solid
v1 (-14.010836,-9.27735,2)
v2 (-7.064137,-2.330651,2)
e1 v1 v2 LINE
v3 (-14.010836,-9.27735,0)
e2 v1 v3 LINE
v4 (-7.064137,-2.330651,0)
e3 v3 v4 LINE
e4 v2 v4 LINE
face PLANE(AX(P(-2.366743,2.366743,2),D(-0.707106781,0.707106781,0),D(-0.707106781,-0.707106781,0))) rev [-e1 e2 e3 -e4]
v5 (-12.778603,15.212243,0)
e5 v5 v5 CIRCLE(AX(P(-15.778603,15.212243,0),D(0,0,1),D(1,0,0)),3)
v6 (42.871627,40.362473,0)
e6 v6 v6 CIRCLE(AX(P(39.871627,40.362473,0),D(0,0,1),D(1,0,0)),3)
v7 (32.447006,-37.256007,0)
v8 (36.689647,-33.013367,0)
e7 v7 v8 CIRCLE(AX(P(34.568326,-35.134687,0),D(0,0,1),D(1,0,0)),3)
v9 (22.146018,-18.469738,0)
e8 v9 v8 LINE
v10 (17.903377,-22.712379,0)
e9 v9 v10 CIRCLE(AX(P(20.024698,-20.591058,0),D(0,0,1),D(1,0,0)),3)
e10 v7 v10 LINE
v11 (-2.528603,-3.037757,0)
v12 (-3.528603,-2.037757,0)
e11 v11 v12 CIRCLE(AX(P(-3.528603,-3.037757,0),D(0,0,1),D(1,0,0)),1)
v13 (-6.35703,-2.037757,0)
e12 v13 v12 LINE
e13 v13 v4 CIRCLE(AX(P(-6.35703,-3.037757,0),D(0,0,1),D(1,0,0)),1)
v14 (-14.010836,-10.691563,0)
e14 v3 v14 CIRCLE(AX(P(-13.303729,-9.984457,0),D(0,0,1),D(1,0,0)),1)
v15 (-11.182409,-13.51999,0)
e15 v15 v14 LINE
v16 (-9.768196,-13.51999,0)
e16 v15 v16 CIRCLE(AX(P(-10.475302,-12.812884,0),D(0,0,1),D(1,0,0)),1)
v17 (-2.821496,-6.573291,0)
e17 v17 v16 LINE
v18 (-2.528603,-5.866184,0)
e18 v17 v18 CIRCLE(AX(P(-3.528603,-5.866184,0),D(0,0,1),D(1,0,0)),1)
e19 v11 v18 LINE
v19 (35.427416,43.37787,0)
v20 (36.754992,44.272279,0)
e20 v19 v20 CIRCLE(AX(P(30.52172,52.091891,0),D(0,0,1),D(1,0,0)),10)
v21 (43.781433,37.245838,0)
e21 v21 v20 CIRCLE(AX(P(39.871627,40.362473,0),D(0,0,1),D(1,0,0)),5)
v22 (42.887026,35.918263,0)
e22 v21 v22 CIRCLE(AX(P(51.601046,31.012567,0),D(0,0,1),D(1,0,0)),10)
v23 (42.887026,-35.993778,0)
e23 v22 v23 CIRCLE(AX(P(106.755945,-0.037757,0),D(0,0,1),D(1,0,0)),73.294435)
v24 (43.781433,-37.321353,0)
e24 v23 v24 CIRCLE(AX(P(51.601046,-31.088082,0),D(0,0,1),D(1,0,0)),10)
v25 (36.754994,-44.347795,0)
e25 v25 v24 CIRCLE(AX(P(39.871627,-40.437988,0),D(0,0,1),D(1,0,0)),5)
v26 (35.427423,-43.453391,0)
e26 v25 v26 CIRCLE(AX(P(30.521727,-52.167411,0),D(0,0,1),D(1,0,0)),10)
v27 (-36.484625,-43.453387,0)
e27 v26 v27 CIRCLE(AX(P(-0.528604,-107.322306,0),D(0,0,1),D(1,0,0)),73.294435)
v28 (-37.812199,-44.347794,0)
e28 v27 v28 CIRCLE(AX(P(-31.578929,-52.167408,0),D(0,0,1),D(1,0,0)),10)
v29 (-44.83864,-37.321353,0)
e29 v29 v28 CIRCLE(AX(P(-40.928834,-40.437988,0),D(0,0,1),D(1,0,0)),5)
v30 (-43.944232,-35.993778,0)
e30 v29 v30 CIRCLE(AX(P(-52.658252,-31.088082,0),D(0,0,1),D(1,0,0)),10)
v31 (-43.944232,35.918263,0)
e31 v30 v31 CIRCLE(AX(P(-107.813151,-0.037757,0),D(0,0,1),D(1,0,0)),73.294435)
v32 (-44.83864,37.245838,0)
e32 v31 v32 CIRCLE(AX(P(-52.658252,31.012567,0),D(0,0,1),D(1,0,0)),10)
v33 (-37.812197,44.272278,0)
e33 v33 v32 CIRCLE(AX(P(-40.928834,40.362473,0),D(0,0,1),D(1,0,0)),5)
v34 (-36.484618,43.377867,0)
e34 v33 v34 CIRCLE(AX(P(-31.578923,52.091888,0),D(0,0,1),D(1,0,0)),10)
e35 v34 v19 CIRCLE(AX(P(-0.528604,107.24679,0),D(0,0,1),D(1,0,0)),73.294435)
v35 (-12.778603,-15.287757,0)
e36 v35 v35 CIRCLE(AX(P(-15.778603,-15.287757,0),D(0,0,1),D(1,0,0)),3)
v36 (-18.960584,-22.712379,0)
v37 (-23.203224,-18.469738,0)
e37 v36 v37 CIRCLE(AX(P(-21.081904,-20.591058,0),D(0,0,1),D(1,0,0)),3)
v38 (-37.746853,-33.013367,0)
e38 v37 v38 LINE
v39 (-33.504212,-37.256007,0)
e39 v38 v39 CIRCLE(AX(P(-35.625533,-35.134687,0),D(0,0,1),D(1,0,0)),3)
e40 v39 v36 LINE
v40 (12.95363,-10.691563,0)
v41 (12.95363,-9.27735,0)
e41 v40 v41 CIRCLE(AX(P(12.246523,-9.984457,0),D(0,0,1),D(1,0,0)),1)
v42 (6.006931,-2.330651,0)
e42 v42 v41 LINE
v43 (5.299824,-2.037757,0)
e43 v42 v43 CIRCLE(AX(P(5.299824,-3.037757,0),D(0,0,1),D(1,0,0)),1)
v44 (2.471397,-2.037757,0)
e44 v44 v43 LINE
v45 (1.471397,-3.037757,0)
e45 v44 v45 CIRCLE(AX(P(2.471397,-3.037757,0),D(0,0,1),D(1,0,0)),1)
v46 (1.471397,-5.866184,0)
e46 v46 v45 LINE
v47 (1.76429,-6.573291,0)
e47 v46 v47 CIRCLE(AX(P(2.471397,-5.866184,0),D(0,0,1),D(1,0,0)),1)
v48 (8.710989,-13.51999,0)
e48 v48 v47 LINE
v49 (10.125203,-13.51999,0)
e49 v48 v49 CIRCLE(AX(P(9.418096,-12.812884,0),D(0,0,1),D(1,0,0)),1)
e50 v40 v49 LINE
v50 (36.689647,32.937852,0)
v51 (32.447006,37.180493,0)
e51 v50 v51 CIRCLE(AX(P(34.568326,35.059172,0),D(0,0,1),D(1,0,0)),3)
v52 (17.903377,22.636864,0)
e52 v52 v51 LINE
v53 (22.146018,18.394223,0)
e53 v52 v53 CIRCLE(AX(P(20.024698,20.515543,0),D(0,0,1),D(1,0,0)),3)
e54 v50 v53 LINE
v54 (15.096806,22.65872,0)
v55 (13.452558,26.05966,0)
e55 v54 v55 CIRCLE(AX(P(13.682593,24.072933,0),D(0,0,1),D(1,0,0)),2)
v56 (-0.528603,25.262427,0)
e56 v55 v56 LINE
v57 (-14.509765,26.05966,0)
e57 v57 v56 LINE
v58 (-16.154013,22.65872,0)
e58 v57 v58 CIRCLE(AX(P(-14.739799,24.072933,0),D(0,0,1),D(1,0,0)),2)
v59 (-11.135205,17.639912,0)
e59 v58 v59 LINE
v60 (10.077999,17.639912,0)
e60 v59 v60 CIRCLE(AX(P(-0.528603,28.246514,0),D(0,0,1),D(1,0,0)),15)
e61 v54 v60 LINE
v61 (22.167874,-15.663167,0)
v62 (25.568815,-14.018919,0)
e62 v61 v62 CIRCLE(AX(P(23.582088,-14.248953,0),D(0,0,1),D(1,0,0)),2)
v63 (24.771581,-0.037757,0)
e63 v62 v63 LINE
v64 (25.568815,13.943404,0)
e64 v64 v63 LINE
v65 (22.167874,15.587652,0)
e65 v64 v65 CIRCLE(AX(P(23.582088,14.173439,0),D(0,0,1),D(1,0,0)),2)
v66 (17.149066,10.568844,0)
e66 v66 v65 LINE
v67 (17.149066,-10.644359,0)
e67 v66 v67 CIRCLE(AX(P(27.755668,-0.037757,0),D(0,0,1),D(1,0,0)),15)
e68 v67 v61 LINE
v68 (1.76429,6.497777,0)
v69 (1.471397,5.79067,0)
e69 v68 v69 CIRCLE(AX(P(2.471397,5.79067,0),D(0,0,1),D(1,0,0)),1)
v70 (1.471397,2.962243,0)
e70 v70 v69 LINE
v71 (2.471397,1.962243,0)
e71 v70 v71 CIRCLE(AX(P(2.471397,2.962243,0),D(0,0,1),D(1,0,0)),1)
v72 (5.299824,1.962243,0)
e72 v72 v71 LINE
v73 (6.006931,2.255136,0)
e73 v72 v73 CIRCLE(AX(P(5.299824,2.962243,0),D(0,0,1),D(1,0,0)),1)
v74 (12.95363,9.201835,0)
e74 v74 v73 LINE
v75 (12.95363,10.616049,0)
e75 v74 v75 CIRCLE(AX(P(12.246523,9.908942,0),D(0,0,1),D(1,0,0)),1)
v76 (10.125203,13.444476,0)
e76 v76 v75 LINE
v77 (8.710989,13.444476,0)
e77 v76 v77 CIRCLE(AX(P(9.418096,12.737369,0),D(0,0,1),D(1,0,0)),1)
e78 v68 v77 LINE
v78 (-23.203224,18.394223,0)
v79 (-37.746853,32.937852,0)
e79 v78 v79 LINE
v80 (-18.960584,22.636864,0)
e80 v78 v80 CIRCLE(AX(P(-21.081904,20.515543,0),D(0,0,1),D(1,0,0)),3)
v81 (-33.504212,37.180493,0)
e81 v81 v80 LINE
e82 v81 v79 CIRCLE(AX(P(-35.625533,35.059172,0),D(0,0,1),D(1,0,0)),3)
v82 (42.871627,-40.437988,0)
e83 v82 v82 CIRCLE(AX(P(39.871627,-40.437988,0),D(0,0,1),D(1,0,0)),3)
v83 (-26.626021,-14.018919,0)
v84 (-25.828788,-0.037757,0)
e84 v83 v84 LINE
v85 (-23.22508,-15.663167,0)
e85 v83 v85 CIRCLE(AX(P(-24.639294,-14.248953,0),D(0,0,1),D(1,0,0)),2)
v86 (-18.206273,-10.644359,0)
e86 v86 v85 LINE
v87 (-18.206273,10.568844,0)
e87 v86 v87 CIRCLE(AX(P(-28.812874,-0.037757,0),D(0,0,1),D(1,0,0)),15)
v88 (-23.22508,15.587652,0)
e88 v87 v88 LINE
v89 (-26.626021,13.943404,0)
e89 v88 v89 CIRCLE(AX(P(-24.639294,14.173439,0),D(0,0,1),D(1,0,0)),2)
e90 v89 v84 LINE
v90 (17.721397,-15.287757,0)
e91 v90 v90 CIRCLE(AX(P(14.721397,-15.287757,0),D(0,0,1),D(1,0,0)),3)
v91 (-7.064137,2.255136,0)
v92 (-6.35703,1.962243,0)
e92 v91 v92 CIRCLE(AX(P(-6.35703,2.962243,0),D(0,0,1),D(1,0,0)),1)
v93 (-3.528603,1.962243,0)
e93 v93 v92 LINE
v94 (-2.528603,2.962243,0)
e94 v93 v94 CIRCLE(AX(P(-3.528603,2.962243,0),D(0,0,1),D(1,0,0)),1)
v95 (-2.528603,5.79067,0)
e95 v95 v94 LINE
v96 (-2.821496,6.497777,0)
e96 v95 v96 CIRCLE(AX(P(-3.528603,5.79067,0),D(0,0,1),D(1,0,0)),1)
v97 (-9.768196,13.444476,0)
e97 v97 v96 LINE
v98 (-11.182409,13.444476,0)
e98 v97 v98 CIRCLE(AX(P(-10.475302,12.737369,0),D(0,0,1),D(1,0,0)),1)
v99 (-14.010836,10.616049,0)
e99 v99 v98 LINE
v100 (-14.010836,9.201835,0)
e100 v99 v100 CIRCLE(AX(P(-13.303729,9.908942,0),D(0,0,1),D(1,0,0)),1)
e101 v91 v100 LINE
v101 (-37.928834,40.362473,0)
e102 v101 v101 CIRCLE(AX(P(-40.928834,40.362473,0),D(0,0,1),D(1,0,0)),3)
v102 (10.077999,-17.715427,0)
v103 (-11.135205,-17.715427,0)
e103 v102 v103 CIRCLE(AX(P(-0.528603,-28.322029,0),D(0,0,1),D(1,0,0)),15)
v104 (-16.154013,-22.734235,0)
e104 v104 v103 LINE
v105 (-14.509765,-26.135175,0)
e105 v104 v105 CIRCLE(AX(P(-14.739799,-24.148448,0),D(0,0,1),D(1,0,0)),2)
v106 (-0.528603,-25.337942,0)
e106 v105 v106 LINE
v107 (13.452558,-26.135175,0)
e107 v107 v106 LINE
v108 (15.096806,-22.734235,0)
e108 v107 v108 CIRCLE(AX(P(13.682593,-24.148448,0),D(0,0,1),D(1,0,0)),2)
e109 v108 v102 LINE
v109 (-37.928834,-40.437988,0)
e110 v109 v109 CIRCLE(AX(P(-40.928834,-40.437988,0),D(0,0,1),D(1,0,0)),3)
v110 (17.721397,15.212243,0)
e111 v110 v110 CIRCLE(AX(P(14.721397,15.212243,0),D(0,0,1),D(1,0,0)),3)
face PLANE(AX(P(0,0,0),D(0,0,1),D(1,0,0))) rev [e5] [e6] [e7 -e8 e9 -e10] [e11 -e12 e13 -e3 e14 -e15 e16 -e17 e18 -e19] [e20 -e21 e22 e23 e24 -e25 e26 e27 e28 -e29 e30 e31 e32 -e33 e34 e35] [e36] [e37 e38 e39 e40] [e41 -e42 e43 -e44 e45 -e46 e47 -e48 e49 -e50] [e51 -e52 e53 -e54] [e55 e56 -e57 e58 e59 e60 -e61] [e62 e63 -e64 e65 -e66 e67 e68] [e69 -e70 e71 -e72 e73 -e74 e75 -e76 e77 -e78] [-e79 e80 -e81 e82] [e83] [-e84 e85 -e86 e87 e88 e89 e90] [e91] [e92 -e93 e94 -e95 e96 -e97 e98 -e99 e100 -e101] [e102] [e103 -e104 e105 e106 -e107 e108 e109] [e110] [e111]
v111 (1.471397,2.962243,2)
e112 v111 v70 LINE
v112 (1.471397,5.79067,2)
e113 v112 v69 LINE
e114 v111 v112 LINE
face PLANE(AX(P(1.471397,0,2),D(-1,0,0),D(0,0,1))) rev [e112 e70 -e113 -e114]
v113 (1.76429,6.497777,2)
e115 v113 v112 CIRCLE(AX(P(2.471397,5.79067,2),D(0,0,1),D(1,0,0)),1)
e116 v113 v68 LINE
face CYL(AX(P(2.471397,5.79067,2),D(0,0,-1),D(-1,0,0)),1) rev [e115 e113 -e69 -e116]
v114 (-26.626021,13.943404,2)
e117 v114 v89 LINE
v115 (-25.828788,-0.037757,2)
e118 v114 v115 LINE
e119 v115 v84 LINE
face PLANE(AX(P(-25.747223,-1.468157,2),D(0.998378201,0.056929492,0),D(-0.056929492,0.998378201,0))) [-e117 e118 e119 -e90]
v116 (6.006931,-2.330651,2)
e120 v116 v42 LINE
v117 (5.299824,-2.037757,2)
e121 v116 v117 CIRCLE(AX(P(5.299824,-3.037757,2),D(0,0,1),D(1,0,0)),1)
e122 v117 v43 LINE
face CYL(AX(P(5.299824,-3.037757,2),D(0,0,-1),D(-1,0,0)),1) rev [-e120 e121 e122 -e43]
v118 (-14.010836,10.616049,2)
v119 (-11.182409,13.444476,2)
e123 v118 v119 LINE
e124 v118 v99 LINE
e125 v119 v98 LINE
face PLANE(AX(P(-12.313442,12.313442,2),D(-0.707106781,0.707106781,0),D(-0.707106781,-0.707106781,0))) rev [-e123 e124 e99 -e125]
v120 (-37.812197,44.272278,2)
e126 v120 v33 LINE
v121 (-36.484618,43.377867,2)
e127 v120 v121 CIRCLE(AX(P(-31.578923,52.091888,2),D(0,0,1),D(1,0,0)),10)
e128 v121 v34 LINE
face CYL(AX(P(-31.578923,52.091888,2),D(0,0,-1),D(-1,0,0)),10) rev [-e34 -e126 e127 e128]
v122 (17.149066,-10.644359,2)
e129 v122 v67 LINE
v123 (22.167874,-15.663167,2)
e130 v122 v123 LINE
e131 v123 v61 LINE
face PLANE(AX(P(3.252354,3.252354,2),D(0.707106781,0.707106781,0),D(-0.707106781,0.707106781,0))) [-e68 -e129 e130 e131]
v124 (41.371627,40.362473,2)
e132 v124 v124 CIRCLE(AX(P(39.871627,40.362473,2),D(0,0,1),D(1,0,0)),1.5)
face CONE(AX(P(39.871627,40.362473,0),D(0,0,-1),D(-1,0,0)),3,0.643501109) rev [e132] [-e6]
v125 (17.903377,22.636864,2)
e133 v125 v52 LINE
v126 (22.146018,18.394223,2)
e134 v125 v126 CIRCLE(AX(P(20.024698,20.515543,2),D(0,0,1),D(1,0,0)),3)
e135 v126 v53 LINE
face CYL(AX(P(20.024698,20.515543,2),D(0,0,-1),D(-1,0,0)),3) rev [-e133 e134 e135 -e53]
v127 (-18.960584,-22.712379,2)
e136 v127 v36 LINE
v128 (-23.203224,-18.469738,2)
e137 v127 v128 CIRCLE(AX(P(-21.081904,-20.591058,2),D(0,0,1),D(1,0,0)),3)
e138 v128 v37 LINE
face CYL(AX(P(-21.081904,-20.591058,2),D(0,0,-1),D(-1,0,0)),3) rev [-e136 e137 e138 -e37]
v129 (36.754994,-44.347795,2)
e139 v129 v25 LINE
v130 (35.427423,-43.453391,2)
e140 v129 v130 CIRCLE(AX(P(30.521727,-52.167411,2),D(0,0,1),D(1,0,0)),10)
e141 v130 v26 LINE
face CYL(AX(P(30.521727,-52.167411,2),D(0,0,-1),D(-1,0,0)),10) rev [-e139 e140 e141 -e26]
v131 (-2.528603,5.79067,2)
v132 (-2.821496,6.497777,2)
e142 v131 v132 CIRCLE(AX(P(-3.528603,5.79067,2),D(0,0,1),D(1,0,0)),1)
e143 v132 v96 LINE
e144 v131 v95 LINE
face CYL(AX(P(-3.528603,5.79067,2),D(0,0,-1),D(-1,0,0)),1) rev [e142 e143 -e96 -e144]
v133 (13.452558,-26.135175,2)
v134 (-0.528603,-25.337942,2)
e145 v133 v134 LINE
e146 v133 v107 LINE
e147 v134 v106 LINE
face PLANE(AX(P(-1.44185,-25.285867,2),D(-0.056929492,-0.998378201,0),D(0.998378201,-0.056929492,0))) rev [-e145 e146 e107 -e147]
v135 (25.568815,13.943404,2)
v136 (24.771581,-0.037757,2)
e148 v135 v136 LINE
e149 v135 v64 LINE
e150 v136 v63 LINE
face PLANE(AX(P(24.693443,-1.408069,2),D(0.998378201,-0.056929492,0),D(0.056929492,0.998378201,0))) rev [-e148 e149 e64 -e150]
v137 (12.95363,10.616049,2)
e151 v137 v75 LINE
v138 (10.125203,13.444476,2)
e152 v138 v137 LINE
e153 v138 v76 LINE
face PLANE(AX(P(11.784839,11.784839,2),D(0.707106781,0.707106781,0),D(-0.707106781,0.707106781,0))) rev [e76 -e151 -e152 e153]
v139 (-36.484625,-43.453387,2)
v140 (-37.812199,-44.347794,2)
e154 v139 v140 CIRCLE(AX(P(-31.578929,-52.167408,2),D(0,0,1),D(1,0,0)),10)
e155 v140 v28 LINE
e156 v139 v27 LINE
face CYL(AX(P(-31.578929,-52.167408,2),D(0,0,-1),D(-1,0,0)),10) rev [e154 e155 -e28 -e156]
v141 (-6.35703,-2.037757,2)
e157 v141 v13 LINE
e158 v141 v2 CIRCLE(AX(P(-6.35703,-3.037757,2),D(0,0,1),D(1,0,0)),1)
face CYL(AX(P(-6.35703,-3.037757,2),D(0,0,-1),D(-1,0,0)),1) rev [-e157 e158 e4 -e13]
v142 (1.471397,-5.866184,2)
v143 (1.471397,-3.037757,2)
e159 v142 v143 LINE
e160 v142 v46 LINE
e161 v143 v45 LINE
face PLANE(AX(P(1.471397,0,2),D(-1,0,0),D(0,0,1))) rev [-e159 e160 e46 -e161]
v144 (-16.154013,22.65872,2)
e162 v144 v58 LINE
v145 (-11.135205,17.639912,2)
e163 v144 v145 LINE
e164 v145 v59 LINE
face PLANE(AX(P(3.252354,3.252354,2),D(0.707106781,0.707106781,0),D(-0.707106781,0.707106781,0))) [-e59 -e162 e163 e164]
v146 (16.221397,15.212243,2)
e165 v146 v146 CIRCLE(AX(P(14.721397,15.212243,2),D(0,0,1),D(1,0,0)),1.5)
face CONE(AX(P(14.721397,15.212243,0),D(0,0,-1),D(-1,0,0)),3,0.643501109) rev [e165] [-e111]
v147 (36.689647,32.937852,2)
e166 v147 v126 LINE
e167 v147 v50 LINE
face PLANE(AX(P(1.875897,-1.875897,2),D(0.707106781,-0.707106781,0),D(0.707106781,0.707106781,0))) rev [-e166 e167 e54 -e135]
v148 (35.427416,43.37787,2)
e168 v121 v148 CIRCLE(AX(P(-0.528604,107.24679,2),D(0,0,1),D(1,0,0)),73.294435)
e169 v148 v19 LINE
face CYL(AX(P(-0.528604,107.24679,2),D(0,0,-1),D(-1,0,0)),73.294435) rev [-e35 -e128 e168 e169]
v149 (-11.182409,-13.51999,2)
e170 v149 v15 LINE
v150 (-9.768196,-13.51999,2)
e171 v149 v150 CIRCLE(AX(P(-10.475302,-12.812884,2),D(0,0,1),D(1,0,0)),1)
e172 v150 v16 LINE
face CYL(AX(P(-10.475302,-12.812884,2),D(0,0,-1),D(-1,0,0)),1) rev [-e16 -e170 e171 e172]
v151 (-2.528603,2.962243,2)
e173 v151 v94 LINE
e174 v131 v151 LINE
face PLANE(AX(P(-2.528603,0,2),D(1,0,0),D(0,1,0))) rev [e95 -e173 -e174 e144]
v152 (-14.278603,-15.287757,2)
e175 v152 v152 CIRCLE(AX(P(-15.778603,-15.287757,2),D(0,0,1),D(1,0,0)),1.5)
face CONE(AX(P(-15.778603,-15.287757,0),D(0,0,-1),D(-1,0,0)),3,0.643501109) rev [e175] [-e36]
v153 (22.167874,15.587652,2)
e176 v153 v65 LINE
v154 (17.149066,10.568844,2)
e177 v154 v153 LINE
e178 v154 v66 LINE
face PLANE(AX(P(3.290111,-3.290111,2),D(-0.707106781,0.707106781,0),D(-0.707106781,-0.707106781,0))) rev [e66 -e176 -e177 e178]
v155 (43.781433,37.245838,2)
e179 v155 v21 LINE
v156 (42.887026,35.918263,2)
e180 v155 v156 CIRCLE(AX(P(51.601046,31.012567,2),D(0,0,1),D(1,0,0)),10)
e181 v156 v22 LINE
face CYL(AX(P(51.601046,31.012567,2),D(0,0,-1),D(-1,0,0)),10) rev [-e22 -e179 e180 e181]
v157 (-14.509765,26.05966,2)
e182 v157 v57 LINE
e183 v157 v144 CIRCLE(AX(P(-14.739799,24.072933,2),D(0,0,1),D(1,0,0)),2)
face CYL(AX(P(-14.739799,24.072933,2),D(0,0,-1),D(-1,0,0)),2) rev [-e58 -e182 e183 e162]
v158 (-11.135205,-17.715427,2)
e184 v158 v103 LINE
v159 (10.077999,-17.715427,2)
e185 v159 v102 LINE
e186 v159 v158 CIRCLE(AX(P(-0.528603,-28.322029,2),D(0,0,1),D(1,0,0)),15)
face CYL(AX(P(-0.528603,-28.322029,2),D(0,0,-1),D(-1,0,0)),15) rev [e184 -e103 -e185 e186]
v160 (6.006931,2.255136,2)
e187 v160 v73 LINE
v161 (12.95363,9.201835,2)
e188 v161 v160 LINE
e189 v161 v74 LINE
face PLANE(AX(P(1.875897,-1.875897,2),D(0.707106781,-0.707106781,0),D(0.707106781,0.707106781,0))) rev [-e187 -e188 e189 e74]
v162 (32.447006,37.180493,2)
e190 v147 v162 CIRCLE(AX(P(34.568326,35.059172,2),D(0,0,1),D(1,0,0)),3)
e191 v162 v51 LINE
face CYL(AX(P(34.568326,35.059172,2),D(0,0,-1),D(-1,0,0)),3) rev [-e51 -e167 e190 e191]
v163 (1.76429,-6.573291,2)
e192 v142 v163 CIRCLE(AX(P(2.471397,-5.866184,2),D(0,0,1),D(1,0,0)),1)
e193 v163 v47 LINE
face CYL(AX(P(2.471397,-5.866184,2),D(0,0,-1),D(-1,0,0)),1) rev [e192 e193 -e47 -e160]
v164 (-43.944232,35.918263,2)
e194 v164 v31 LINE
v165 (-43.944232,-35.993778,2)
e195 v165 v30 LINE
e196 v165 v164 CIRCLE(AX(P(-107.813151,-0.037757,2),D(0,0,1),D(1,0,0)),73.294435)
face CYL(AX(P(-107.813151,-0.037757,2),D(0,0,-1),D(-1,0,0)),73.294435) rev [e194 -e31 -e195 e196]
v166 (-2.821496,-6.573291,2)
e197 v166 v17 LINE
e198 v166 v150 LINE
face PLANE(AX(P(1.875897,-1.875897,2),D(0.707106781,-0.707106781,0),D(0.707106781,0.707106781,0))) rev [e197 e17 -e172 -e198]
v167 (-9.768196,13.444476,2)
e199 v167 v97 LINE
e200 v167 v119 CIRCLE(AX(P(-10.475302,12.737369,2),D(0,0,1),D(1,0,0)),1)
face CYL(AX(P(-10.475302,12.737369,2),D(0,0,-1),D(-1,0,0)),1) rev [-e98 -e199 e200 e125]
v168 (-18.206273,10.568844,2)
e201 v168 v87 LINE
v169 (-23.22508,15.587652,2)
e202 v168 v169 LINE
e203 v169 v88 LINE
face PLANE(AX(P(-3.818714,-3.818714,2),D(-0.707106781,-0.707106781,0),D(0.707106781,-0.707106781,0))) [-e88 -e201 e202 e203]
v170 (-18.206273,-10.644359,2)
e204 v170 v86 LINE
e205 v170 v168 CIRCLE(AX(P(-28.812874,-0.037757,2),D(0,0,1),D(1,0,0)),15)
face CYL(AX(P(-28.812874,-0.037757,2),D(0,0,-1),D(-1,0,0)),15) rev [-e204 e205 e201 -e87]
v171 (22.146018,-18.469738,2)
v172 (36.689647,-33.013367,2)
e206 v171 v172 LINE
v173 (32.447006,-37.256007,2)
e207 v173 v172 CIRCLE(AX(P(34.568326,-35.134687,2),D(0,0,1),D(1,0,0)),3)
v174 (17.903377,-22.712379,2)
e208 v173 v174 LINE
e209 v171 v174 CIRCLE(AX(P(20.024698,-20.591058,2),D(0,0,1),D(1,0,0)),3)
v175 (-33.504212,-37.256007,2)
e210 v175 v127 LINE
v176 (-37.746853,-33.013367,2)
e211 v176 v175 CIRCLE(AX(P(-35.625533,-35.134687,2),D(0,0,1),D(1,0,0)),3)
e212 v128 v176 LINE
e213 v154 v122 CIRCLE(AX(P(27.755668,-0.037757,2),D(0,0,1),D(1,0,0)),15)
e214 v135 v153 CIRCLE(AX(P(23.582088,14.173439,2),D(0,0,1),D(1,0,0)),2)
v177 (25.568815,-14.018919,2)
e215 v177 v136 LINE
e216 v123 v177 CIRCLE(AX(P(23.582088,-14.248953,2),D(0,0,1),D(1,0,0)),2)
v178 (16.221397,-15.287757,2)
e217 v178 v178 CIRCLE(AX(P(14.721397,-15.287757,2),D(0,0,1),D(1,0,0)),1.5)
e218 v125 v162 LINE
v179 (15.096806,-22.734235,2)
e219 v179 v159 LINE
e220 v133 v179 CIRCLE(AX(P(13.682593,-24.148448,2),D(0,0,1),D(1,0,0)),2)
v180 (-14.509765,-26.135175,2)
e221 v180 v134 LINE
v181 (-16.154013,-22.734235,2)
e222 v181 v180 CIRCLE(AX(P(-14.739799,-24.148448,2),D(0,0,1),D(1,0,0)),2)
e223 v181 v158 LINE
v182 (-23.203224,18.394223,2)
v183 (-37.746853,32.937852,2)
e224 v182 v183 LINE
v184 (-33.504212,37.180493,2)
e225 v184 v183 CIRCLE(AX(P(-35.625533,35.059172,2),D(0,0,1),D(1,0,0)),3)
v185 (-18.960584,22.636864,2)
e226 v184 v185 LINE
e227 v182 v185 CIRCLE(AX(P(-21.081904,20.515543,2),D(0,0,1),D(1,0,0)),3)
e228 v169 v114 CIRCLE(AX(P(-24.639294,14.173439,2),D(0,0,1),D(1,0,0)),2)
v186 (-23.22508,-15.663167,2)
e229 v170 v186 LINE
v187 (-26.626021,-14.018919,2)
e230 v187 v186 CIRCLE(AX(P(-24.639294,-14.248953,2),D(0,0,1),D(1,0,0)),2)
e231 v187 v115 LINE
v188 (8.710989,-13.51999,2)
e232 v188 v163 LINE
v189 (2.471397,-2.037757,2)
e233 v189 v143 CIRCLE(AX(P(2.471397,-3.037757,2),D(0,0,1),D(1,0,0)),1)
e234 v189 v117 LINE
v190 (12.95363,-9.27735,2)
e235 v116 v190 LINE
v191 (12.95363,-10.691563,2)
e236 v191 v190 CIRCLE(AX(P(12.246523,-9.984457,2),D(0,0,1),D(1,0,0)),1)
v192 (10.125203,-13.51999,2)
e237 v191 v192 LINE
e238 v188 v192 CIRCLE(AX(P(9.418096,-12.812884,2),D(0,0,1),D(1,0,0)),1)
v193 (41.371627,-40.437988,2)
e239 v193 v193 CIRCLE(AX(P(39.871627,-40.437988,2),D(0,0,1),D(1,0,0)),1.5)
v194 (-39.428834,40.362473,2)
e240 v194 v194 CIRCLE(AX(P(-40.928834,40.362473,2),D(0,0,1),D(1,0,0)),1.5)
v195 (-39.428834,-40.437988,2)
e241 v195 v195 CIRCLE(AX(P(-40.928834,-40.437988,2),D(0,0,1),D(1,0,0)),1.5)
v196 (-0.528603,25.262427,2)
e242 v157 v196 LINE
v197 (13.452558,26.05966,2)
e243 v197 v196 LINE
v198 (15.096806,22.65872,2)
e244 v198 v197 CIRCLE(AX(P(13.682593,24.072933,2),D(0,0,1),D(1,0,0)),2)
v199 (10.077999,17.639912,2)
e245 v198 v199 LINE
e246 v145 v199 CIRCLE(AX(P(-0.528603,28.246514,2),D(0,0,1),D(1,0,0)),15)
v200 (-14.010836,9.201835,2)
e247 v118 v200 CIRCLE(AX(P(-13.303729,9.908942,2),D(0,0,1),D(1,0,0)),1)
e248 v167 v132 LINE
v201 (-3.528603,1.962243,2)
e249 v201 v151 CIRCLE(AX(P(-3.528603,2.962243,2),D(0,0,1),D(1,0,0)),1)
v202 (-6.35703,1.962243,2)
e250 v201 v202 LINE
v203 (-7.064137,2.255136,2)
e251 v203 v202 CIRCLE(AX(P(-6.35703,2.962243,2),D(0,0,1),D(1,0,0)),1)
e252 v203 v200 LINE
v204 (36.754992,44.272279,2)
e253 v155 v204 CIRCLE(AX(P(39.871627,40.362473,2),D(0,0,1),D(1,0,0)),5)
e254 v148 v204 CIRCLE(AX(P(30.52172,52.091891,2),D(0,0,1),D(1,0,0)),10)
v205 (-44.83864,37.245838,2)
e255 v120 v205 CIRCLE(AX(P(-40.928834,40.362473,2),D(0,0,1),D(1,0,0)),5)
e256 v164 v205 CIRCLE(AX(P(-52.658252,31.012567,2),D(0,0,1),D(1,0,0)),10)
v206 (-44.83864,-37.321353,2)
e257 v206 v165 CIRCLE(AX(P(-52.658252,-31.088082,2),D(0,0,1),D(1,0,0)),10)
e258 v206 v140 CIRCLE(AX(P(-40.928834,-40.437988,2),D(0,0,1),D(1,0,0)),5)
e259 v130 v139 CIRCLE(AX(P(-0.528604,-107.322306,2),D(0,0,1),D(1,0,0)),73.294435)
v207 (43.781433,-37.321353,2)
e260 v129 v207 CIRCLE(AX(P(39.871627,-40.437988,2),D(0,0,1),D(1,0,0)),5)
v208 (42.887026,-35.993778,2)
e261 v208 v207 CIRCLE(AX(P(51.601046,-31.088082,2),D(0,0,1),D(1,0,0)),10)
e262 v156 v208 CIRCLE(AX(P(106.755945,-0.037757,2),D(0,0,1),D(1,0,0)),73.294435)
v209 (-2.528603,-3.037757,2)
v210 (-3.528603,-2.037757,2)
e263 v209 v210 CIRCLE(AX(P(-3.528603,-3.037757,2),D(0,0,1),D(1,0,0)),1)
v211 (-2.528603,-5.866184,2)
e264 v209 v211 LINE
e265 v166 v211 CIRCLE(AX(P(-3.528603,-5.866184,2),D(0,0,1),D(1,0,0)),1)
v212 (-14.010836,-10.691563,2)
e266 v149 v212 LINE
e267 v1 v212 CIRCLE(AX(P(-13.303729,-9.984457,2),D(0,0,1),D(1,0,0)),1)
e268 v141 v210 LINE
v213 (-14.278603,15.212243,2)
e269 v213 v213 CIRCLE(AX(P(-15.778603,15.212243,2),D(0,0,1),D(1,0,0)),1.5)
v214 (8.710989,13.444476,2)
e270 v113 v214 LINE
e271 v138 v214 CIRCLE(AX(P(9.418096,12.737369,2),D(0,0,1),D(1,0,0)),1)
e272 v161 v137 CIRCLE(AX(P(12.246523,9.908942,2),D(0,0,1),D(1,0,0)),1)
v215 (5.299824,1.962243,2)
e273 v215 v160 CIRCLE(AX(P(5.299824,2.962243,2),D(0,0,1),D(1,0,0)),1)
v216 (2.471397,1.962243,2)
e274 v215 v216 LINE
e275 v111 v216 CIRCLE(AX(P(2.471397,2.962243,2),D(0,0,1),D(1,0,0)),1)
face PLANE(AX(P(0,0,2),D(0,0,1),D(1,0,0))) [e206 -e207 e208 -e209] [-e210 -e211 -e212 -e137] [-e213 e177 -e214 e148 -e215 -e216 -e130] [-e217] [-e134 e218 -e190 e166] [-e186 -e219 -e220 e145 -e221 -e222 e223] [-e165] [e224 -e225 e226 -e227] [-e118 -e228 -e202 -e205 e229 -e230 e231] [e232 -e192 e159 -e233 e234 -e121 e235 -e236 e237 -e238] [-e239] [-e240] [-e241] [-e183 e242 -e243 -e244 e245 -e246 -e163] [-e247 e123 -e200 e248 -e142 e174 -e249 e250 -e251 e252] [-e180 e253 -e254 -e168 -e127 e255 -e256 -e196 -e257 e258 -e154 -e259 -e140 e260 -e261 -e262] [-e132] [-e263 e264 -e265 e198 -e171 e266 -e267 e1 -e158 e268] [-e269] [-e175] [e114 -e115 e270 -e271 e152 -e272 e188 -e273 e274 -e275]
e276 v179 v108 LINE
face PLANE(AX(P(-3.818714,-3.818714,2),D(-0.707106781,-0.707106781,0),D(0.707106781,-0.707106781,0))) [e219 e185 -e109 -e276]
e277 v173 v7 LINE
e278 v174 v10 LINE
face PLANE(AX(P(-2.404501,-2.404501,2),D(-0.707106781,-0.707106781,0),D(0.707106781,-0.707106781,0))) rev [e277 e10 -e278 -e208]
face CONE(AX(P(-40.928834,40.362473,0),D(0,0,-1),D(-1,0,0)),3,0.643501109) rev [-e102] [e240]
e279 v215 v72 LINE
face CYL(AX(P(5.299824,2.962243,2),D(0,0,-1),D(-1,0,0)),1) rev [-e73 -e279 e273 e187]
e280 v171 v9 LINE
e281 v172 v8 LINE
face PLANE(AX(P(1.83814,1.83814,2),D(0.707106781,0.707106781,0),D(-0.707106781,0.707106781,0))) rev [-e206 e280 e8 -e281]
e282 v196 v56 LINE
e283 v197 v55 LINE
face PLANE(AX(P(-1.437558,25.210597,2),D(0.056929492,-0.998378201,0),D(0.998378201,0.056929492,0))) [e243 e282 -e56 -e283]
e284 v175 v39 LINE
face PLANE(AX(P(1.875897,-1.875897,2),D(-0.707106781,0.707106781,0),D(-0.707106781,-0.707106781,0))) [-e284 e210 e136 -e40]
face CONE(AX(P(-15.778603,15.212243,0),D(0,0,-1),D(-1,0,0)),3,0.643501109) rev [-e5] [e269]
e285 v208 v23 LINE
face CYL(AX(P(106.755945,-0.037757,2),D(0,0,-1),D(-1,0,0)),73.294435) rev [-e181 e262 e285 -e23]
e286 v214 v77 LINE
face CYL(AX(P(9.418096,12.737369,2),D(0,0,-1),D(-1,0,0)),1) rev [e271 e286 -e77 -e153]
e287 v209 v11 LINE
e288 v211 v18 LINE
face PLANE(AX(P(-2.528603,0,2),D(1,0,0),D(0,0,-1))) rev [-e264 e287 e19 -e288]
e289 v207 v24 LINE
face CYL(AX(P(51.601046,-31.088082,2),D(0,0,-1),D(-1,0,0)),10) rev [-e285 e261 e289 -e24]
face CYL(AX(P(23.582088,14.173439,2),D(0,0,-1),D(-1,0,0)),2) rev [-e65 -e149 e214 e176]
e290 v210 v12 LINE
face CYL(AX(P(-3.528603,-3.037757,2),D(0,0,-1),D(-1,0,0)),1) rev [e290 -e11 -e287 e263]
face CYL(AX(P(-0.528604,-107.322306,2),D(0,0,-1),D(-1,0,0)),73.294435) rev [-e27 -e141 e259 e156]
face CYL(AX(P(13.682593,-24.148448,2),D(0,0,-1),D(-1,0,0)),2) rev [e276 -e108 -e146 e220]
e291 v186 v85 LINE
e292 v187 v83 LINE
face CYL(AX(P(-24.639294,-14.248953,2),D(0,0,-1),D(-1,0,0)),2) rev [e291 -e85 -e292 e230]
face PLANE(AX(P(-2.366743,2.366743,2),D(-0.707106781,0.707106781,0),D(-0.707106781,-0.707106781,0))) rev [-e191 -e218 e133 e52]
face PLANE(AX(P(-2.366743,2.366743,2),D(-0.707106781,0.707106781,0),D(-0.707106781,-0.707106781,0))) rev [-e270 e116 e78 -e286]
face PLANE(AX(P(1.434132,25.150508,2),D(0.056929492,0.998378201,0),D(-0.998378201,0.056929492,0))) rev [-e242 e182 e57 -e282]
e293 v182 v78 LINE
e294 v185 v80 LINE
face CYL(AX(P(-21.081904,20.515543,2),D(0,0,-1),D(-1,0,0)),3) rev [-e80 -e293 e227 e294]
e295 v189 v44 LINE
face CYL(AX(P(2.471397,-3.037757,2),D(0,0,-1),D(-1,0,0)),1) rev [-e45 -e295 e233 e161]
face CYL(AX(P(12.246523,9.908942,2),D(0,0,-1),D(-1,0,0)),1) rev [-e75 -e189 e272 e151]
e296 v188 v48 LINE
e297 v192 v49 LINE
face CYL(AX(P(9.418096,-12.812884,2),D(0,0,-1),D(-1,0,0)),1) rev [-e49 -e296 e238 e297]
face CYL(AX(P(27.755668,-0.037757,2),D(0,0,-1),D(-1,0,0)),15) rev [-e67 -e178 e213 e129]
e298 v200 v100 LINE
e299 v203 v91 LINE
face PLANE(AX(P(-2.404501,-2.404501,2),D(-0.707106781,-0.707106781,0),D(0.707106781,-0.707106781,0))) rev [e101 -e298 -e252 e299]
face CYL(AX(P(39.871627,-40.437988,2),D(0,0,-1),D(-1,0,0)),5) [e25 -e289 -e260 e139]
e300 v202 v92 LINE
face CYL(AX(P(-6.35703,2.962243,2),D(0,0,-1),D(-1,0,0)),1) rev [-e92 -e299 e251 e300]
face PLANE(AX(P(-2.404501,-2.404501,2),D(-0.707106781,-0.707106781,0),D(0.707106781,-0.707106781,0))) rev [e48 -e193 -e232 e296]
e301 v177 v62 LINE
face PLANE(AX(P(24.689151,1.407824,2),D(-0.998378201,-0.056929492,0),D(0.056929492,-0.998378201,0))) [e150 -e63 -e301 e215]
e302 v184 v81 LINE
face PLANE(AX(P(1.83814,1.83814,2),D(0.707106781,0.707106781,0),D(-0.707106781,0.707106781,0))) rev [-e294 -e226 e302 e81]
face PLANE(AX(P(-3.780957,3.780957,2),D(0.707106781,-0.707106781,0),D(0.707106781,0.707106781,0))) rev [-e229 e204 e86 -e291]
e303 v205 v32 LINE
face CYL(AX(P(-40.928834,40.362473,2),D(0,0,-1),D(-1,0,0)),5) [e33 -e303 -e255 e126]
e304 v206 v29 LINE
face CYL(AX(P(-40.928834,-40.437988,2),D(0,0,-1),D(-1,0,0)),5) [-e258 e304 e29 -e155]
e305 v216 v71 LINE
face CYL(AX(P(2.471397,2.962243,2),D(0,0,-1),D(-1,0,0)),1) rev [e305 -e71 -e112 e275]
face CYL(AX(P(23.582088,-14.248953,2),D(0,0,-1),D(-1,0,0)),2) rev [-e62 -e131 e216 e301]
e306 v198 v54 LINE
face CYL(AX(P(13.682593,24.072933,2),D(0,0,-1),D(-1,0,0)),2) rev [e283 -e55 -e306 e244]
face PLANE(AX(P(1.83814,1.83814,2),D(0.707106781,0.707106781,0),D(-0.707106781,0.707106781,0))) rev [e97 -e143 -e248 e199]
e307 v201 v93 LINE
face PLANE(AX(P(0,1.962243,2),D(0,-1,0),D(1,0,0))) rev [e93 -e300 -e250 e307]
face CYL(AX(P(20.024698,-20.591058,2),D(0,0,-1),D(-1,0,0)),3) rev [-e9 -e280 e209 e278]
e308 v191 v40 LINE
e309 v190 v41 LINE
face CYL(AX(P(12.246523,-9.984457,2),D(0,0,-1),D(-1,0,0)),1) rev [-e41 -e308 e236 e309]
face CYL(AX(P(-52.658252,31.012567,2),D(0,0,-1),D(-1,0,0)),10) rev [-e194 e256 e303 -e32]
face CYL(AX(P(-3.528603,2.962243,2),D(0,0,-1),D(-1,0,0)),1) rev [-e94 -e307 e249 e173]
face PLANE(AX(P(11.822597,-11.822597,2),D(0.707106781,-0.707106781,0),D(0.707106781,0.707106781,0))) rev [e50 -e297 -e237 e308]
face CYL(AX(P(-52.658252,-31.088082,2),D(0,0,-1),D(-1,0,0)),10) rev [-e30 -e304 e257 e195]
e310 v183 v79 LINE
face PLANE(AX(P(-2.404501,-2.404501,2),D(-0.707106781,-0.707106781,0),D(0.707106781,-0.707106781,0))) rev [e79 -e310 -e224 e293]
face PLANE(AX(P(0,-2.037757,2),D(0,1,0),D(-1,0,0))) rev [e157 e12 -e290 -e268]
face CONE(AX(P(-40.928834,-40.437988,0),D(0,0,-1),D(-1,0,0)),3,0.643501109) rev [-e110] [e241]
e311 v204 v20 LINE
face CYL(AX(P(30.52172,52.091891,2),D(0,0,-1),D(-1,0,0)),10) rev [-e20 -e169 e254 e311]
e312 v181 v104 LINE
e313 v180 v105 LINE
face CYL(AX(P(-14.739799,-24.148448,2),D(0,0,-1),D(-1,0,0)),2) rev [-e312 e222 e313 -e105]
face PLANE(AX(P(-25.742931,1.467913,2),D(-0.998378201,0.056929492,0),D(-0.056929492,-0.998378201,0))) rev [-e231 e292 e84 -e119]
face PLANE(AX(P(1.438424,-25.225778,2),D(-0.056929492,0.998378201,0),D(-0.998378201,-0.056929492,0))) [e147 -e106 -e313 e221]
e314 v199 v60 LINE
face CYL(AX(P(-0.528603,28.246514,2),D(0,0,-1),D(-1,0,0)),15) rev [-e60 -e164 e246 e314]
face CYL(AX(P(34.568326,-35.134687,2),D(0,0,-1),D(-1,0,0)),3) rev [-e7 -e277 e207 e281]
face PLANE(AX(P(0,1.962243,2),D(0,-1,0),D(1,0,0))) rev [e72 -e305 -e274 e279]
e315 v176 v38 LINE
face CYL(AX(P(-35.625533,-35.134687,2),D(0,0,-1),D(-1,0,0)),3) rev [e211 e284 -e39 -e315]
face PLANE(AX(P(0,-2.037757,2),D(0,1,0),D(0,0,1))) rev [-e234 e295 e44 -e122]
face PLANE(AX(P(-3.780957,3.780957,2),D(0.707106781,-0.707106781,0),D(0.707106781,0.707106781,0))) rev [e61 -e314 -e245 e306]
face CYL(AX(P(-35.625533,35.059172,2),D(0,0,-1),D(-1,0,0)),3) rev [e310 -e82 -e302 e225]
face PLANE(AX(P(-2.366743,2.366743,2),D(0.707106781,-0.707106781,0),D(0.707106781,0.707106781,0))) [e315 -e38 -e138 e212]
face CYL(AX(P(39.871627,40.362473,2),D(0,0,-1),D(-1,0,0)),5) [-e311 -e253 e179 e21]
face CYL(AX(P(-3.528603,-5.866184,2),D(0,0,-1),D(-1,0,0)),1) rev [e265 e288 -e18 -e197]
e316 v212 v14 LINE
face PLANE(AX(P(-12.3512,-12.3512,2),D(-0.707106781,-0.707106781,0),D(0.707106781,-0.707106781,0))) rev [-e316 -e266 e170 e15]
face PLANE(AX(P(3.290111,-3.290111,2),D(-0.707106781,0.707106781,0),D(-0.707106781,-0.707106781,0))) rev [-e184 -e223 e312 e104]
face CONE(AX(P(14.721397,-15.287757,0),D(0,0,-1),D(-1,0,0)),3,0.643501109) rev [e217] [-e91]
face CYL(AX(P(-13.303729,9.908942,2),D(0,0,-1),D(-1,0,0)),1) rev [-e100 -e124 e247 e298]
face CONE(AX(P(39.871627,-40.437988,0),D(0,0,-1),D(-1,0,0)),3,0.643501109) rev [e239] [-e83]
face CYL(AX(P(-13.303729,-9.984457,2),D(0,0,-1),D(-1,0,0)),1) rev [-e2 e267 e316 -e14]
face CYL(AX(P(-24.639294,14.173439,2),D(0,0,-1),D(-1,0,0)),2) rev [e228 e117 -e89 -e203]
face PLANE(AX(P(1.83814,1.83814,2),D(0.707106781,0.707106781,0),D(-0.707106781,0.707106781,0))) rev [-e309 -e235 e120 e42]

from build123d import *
from OCP.BRepFilletAPI import BRepFilletAPI_MakeChamfer

# Parameters (mm, degrees)
SKETCH_1_R       = 1.5
EXTRUDE_1_DEPTH  = 2
CHAMFER_2_SIZE   = 2
CHAMFER_2_SIZE_2 = 1.5


with BuildPart() as part:
    # 草图1 → 凸台-拉伸1 (new body)
    with BuildSketch(Plane.XY):
        with BuildLine():
            ThreePointArc((-43.944231971, -35.993777794), (-44.364829153, -36.675490513), (-44.838639776, -37.321352508))
            ThreePointArc((-44.838639776, -37.321352508), (-44.464367688, -43.973521466), (-37.812198776, -44.347794369))
            ThreePointArc((-37.812198776, -44.347794369), (-37.166337282, -43.873984202), (-36.484625127, -43.453387388))
            ThreePointArc((-36.484625127, -43.453387388), (-0.528600442, -34.027870838), (35.427423346, -43.453390808))
            ThreePointArc((35.427423346, -43.453390808), (36.109133758, -43.873986539), (36.754993697, -44.347795354))
            ThreePointArc((36.754993697, -44.347795354), (43.407161932, -43.973520907), (43.78143346, -37.321352507))
            ThreePointArc((43.78143346, -37.321352507), (43.307622836, -36.675490511), (42.887025653, -35.99377779))
            ThreePointArc((42.887025653, -35.99377779), (33.461509541, -0.037757365), (42.887025658, 35.918263059))
            ThreePointArc((42.887025658, 35.918263059), (43.307622839, 36.599975778), (43.781433461, 37.245837772))
            ThreePointArc((43.781433461, 37.245837772), (43.407160939, 43.898007163), (36.754991502, 44.272278867))
            ThreePointArc((36.754991502, 44.272278867), (36.109129005, 43.798467788), (35.42741572, 43.377870236))
            ThreePointArc((35.42741572, 43.377870236), (-0.528600445, 33.952354559), (-36.484617506, 43.37786682))
            ThreePointArc((-36.484617506, 43.37786682), (-37.166332534, 43.798465454), (-37.812196583, 44.272277884))
            ThreePointArc((-37.812196583, 44.272277884), (-44.464366696, 43.898007721), (-44.838639776, 37.245837771))
            ThreePointArc((-44.838639776, 37.245837771), (-44.364829153, 36.599975777), (-43.944231971, 35.918263057))
            ThreePointArc((-43.944231971, 35.918263057), (-34.518715856, -0.037757368), (-43.944231971, -35.993777794))
        make_face()
        with Locations((-40.928833565, 40.36247304)):
            Circle(SKETCH_1_R, mode=Mode.SUBTRACT)
        with BuildLine():
            Line((-37.74685305, -33.013366574), (-23.20322436, -18.469737884))
            ThreePointArc((-23.20322436, -18.469737884), (-18.960583673, -18.469737884), (-18.960583673, -22.712378571))
            Line((-18.960583673, -22.712378571), (-33.504212363, -37.256007261))
            ThreePointArc((-33.504212363, -37.256007261), (-37.74685305, -37.256007261), (-37.74685305, -33.013366574))
        make_face(mode=Mode.SUBTRACT)
        with BuildLine():
            Line((10.07799856, -17.715426898), (15.096806284, -22.734234622))
            ThreePointArc((15.096806284, -22.734234622), (15.4831952, -25.018982914), (13.452558365, -26.13517519))
            add(Edge.make_bspline(
                [(13.452558365, -26.13517519), (8.792171191, -25.869430733), (4.131784017, -25.603686276), (-0.528603157, -25.33794182)],
                knots=[0, 0, 0, 0, 1.400387298, 1.400387298, 1.400387298, 1.400387298], degree=3))
            add(Edge.make_bspline(
                [(-14.50976468, -26.13517519), (-9.849377505, -25.869430733), (-5.188990331, -25.603686276), (-0.528603157, -25.33794182)],
                knots=[0, 0, 0, 0, 1.400387298, 1.400387298, 1.400387298, 1.400387298], degree=3))
            ThreePointArc((-14.50976468, -26.13517519), (-16.540401515, -25.018982914), (-16.154012599, -22.734234622))
            Line((-16.154012599, -22.734234622), (-11.135204875, -17.715426898))
            ThreePointArc((-11.135204875, -17.715426898), (-0.528603157, -13.322028616), (10.07799856, -17.715426898))
        make_face(mode=Mode.SUBTRACT)
        with BuildLine():
            Line((-18.206272687, -10.644359086), (-23.225080411, -15.66316681))
            ThreePointArc((-23.225080411, -15.66316681), (-25.509828703, -16.049555726), (-26.626020979, -14.01891889))
            add(Edge.make_bspline(
                [(-26.626020979, -14.01891889), (-26.360276522, -9.358531716), (-26.094532065, -4.698144542), (-25.828787609, -0.037757368)],
                knots=[0, 0, 0, 0, 1.400387298, 1.400387298, 1.400387298, 1.400387298], degree=3))
            add(Edge.make_bspline(
                [(-26.626020979, 13.943404154), (-26.360276522, 9.28301698), (-26.094532065, 4.622629806), (-25.828787609, -0.037757368)],
                knots=[0, 0, 0, 0, 1.400387298, 1.400387298, 1.400387298, 1.400387298], degree=3))
            ThreePointArc((-26.626020979, 13.943404154), (-25.509828703, 15.974040989), (-23.225080411, 15.587652073))
            Line((-23.225080411, 15.587652073), (-18.206272687, 10.568844349))
            ThreePointArc((-18.206272687, 10.568844349), (-13.812874405, -0.037757368), (-18.206272687, -10.644359086))
        make_face(mode=Mode.SUBTRACT)
        with BuildLine():
            ThreePointArc((-9.768195517, -13.519990415), (-10.475302299, -13.812883634), (-11.18240908, -13.519990415))
            Line((-11.18240908, -13.519990415), (-14.010836204, -10.691563291))
            ThreePointArc((-14.010836204, -10.691563291), (-14.303729423, -9.984456509), (-14.010836204, -9.277349728))
            Line((-14.010836204, -9.277349728), (-7.064137063, -2.330650587))
            ThreePointArc((-7.064137063, -2.330650587), (-6.739713715, -2.113877836), (-6.357030282, -2.037757368))
            Line((-6.357030282, -2.037757368), (-3.528603157, -2.037757368))
            ThreePointArc((-3.528603157, -2.037757368), (-2.821496376, -2.330650587), (-2.528603157, -3.037757368))
            Line((-2.528603157, -3.037757368), (-2.528603157, -5.866184493))
            ThreePointArc((-2.528603157, -5.866184493), (-2.604723625, -6.248867925), (-2.821496376, -6.573291274))
            Line((-2.821496376, -6.573291274), (-9.768195517, -13.519990415))
        make_face(mode=Mode.SUBTRACT)
        with BuildLine():
            ThreePointArc((17.903377358, -22.712378571), (17.903377358, -18.469737884), (22.146018045, -18.469737884))
            Line((22.146018045, -18.469737884), (36.689646735, -33.013366574))
            ThreePointArc((36.689646735, -33.013366574), (36.689646735, -37.256007261), (32.447006048, -37.256007261))
            Line((32.447006048, -37.256007261), (17.903377358, -22.712378571))
        make_face(mode=Mode.SUBTRACT)
        with BuildLine():
            ThreePointArc((12.95362989, -9.277349728), (13.246523108, -9.984456509), (12.95362989, -10.691563291))
            Line((12.95362989, -10.691563291), (10.125202765, -13.519990415))
            ThreePointArc((10.125202765, -13.519990415), (9.418095984, -13.812883634), (8.710989202, -13.519990415))
            Line((8.710989202, -13.519990415), (1.764290061, -6.573291274))
            ThreePointArc((1.764290061, -6.573291274), (1.54751731, -6.248867925), (1.471396843, -5.866184493))
            Line((1.471396843, -5.866184493), (1.471396843, -3.037757368))
            ThreePointArc((1.471396843, -3.037757368), (1.764290061, -2.330650587), (2.471396843, -2.037757368))
            Line((2.471396843, -2.037757368), (5.299823967, -2.037757368))
            ThreePointArc((5.299823967, -2.037757368), (5.6825074, -2.113877836), (6.006930748, -2.330650587))
            Line((6.006930748, -2.330650587), (12.95362989, -9.277349728))
        make_face(mode=Mode.SUBTRACT)
        with BuildLine():
            ThreePointArc((-14.010836204, 9.201834992), (-14.303729423, 9.908941773), (-14.010836204, 10.616048554))
            Line((-14.010836204, 10.616048554), (-11.18240908, 13.444475679))
            ThreePointArc((-11.18240908, 13.444475679), (-10.475302299, 13.737368897), (-9.768195517, 13.444475679))
            Line((-9.768195517, 13.444475679), (-2.821496376, 6.497776538))
            ThreePointArc((-2.821496376, 6.497776538), (-2.604723625, 6.173353189), (-2.528603157, 5.790669756))
            Line((-2.528603157, 5.790669756), (-2.528603157, 2.962242632))
            ThreePointArc((-2.528603157, 2.962242632), (-2.821496376, 2.25513585), (-3.528603157, 1.962242632))
            Line((-3.528603157, 1.962242632), (-6.357030282, 1.962242632))
            ThreePointArc((-6.357030282, 1.962242632), (-6.739713715, 2.038363099), (-7.064137063, 2.25513585))
            Line((-7.064137063, 2.25513585), (-14.010836204, 9.201834992))
        make_face(mode=Mode.SUBTRACT)
        with BuildLine():
            ThreePointArc((13.452558365, 26.059660453), (15.4831952, 24.943468177), (15.096806284, 22.658719885))
            Line((15.096806284, 22.658719885), (10.07799856, 17.639912161))
            ThreePointArc((10.07799856, 17.639912161), (-0.528603157, 13.246513879), (-11.135204875, 17.639912161))
            Line((-11.135204875, 17.639912161), (-16.154012599, 22.658719885))
            ThreePointArc((-16.154012599, 22.658719885), (-16.540401515, 24.943468177), (-14.50976468, 26.059660453))
            add(Edge.make_bspline(
                [(-14.50976468, 26.059660453), (-9.849377505, 25.793915996), (-5.188990331, 25.52817154), (-0.528603157, 25.262427083)],
                knots=[0, 0, 0, 0, 1.400387298, 1.400387298, 1.400387298, 1.400387298], degree=3))
            add(Edge.make_bspline(
                [(13.452558365, 26.059660453), (8.792171191, 25.793915996), (4.131784017, 25.52817154), (-0.528603157, 25.262427083)],
                knots=[0, 0, 0, 0, 1.400387298, 1.400387298, 1.400387298, 1.400387298], degree=3))
        make_face(mode=Mode.SUBTRACT)
        with BuildLine():
            ThreePointArc((-37.74685305, 32.937851837), (-37.74685305, 37.180492524), (-33.504212363, 37.180492524))
            Line((-33.504212363, 37.180492524), (-18.960583673, 22.636863834))
            ThreePointArc((-18.960583673, 22.636863834), (-18.960583673, 18.394223147), (-23.20322436, 18.394223147))
            Line((-23.20322436, 18.394223147), (-37.74685305, 32.937851837))
        make_face(mode=Mode.SUBTRACT)
        with BuildLine():
            ThreePointArc((8.710989202, 13.444475679), (9.418095984, 13.737368897), (10.125202765, 13.444475679))
            Line((10.125202765, 13.444475679), (12.95362989, 10.616048554))
            ThreePointArc((12.95362989, 10.616048554), (13.246523108, 9.908941773), (12.95362989, 9.201834992))
            Line((12.95362989, 9.201834992), (6.006930748, 2.25513585))
            ThreePointArc((6.006930748, 2.25513585), (5.6825074, 2.038363099), (5.299823967, 1.962242632))
            Line((5.299823967, 1.962242632), (2.471396843, 1.962242632))
            ThreePointArc((2.471396843, 1.962242632), (1.764290061, 2.25513585), (1.471396843, 2.962242632))
            Line((1.471396843, 2.962242632), (1.471396843, 5.790669756))
            ThreePointArc((1.471396843, 5.790669756), (1.54751731, 6.173353189), (1.764290061, 6.497776538))
            Line((1.764290061, 6.497776538), (8.710989202, 13.444475679))
        make_face(mode=Mode.SUBTRACT)
        with BuildLine():
            Line((22.167874096, -15.66316681), (17.149066372, -10.644359086))
            ThreePointArc((17.149066372, -10.644359086), (12.75566809, -0.037757368), (17.149066372, 10.56884435))
            Line((17.149066372, 10.56884435), (22.167874096, 15.587652073))
            ThreePointArc((22.167874096, 15.587652073), (24.452622388, 15.974040989), (25.568814664, 13.943404154))
            add(Edge.make_bspline(
                [(25.568814664, 13.943404154), (25.303070207, 9.28301698), (25.03732575, 4.622629806), (24.771581294, -0.037757368)],
                knots=[0, 0, 0, 0, 1.400387298, 1.400387298, 1.400387298, 1.400387298], degree=3))
            add(Edge.make_bspline(
                [(25.568814664, -14.01891889), (25.303070207, -9.358531716), (25.03732575, -4.698144542), (24.771581294, -0.037757368)],
                knots=[0, 0, 0, 0, 1.400387298, 1.400387298, 1.400387298, 1.400387298], degree=3))
            ThreePointArc((25.568814664, -14.01891889), (24.452622388, -16.049555726), (22.167874096, -15.66316681))
        make_face(mode=Mode.SUBTRACT)
        with BuildLine():
            ThreePointArc((22.146018045, 18.394223147), (17.903377358, 18.394223147), (17.903377358, 22.636863834))
            Line((17.903377358, 22.636863834), (32.447006048, 37.180492524))
            ThreePointArc((32.447006048, 37.180492524), (36.689646735, 37.180492524), (36.689646735, 32.937851837))
            Line((36.689646735, 32.937851837), (22.146018045, 18.394223147))
        make_face(mode=Mode.SUBTRACT)
        with Locations((-40.928833565, -40.437987776)):
            Circle(SKETCH_1_R, mode=Mode.SUBTRACT)
        with Locations((-15.778603157, -15.287757368)):
            Circle(SKETCH_1_R, mode=Mode.SUBTRACT)
        with Locations((39.871627251, -40.437987776)):
            Circle(SKETCH_1_R, mode=Mode.SUBTRACT)
        with Locations((14.721396843, -15.287757368)):
            Circle(SKETCH_1_R, mode=Mode.SUBTRACT)
        with Locations((-15.778603157, 15.212242632)):
            Circle(SKETCH_1_R, mode=Mode.SUBTRACT)
        with Locations((39.871627251, 40.36247304)):
            Circle(SKETCH_1_R, mode=Mode.SUBTRACT)
        with Locations((14.721396843, 15.212242632)):
            Circle(SKETCH_1_R, mode=Mode.SUBTRACT)
    extrude(amount=EXTRUDE_1_DEPTH)

    # 倒角2
    chamfer_2_edges_1 = [part.edges().sort_by_distance(p)[0] for p in [
        (38.371627251, -40.437987776, 0),
    ]]
    chamfer_2_side_1 = [part.faces().sort_by_distance(p)[0] for p in [
        (38.371627251, -40.437987776, 0.03),
    ]]
    chamfer_2_edges_2 = [part.edges().sort_by_distance(p)[0] for p in [
        (13.221396843, -15.287757368, 0),
    ]]
    chamfer_2_side_2 = [part.faces().sort_by_distance(p)[0] for p in [
        (13.221396843, -15.287757368, 0.03),
    ]]
    chamfer_2_edges_3 = [part.edges().sort_by_distance(p)[0] for p in [
        (-42.428833565, -40.437987776, 0),
    ]]
    chamfer_2_side_3 = [part.faces().sort_by_distance(p)[0] for p in [
        (-42.428833565, -40.437987776, 0.03),
    ]]
    chamfer_2_edges_4 = [part.edges().sort_by_distance(p)[0] for p in [
        (-17.278603157, -15.287757368, 0),
    ]]
    chamfer_2_side_4 = [part.faces().sort_by_distance(p)[0] for p in [
        (-17.278603157, -15.287757368, 0.03),
    ]]
    chamfer_2_edges_5 = [part.edges().sort_by_distance(p)[0] for p in [
        (38.371627251, 40.36247304, 0),
    ]]
    chamfer_2_side_5 = [part.faces().sort_by_distance(p)[0] for p in [
        (38.371627251, 40.36247304, 0.03),
    ]]
    chamfer_2_edges_6 = [part.edges().sort_by_distance(p)[0] for p in [
        (-17.278603157, 15.212242632, 0),
    ]]
    chamfer_2_side_6 = [part.faces().sort_by_distance(p)[0] for p in [
        (-17.278603157, 15.212242632, 0.03),
    ]]
    chamfer_2_edges_7 = [part.edges().sort_by_distance(p)[0] for p in [
        (13.221396843, 15.212242632, 0),
    ]]
    chamfer_2_side_7 = [part.faces().sort_by_distance(p)[0] for p in [
        (13.221396843, 15.212242632, 0.03),
    ]]
    chamfer_2_edges_8 = [part.edges().sort_by_distance(p)[0] for p in [
        (-42.428833565, 40.36247304, 0),
    ]]
    chamfer_2_side_8 = [part.faces().sort_by_distance(p)[0] for p in [
        (-42.428833565, 40.36247304, 0.03),
    ]]
    chamfer_2 = BRepFilletAPI_MakeChamfer(part.part.solid().wrapped)
    for e in chamfer_2_edges_1:
        chamfer_2.Add(CHAMFER_2_SIZE - 0.0001, CHAMFER_2_SIZE_2 - 0.0001, e.wrapped, chamfer_2_side_1[0].wrapped)
    for e in chamfer_2_edges_2:
        chamfer_2.Add(CHAMFER_2_SIZE - 0.0001, CHAMFER_2_SIZE_2 - 0.0001, e.wrapped, chamfer_2_side_2[0].wrapped)
    for e in chamfer_2_edges_3:
        chamfer_2.Add(CHAMFER_2_SIZE - 0.0001, CHAMFER_2_SIZE_2 - 0.0001, e.wrapped, chamfer_2_side_3[0].wrapped)
    for e in chamfer_2_edges_4:
        chamfer_2.Add(CHAMFER_2_SIZE - 0.0001, CHAMFER_2_SIZE_2 - 0.0001, e.wrapped, chamfer_2_side_4[0].wrapped)
    for e in chamfer_2_edges_5:
        chamfer_2.Add(CHAMFER_2_SIZE - 0.0001, CHAMFER_2_SIZE_2 - 0.0001, e.wrapped, chamfer_2_side_5[0].wrapped)
    for e in chamfer_2_edges_6:
        chamfer_2.Add(CHAMFER_2_SIZE - 0.0001, CHAMFER_2_SIZE_2 - 0.0001, e.wrapped, chamfer_2_side_6[0].wrapped)
    for e in chamfer_2_edges_7:
        chamfer_2.Add(CHAMFER_2_SIZE - 0.0001, CHAMFER_2_SIZE_2 - 0.0001, e.wrapped, chamfer_2_side_7[0].wrapped)
    for e in chamfer_2_edges_8:
        chamfer_2.Add(CHAMFER_2_SIZE - 0.0001, CHAMFER_2_SIZE_2 - 0.0001, e.wrapped, chamfer_2_side_8[0].wrapped)
    add(Compound.cast(chamfer_2.Shape()), mode=Mode.REPLACE)  # a hair under: the kernel refuses the full size


solid = part.part
